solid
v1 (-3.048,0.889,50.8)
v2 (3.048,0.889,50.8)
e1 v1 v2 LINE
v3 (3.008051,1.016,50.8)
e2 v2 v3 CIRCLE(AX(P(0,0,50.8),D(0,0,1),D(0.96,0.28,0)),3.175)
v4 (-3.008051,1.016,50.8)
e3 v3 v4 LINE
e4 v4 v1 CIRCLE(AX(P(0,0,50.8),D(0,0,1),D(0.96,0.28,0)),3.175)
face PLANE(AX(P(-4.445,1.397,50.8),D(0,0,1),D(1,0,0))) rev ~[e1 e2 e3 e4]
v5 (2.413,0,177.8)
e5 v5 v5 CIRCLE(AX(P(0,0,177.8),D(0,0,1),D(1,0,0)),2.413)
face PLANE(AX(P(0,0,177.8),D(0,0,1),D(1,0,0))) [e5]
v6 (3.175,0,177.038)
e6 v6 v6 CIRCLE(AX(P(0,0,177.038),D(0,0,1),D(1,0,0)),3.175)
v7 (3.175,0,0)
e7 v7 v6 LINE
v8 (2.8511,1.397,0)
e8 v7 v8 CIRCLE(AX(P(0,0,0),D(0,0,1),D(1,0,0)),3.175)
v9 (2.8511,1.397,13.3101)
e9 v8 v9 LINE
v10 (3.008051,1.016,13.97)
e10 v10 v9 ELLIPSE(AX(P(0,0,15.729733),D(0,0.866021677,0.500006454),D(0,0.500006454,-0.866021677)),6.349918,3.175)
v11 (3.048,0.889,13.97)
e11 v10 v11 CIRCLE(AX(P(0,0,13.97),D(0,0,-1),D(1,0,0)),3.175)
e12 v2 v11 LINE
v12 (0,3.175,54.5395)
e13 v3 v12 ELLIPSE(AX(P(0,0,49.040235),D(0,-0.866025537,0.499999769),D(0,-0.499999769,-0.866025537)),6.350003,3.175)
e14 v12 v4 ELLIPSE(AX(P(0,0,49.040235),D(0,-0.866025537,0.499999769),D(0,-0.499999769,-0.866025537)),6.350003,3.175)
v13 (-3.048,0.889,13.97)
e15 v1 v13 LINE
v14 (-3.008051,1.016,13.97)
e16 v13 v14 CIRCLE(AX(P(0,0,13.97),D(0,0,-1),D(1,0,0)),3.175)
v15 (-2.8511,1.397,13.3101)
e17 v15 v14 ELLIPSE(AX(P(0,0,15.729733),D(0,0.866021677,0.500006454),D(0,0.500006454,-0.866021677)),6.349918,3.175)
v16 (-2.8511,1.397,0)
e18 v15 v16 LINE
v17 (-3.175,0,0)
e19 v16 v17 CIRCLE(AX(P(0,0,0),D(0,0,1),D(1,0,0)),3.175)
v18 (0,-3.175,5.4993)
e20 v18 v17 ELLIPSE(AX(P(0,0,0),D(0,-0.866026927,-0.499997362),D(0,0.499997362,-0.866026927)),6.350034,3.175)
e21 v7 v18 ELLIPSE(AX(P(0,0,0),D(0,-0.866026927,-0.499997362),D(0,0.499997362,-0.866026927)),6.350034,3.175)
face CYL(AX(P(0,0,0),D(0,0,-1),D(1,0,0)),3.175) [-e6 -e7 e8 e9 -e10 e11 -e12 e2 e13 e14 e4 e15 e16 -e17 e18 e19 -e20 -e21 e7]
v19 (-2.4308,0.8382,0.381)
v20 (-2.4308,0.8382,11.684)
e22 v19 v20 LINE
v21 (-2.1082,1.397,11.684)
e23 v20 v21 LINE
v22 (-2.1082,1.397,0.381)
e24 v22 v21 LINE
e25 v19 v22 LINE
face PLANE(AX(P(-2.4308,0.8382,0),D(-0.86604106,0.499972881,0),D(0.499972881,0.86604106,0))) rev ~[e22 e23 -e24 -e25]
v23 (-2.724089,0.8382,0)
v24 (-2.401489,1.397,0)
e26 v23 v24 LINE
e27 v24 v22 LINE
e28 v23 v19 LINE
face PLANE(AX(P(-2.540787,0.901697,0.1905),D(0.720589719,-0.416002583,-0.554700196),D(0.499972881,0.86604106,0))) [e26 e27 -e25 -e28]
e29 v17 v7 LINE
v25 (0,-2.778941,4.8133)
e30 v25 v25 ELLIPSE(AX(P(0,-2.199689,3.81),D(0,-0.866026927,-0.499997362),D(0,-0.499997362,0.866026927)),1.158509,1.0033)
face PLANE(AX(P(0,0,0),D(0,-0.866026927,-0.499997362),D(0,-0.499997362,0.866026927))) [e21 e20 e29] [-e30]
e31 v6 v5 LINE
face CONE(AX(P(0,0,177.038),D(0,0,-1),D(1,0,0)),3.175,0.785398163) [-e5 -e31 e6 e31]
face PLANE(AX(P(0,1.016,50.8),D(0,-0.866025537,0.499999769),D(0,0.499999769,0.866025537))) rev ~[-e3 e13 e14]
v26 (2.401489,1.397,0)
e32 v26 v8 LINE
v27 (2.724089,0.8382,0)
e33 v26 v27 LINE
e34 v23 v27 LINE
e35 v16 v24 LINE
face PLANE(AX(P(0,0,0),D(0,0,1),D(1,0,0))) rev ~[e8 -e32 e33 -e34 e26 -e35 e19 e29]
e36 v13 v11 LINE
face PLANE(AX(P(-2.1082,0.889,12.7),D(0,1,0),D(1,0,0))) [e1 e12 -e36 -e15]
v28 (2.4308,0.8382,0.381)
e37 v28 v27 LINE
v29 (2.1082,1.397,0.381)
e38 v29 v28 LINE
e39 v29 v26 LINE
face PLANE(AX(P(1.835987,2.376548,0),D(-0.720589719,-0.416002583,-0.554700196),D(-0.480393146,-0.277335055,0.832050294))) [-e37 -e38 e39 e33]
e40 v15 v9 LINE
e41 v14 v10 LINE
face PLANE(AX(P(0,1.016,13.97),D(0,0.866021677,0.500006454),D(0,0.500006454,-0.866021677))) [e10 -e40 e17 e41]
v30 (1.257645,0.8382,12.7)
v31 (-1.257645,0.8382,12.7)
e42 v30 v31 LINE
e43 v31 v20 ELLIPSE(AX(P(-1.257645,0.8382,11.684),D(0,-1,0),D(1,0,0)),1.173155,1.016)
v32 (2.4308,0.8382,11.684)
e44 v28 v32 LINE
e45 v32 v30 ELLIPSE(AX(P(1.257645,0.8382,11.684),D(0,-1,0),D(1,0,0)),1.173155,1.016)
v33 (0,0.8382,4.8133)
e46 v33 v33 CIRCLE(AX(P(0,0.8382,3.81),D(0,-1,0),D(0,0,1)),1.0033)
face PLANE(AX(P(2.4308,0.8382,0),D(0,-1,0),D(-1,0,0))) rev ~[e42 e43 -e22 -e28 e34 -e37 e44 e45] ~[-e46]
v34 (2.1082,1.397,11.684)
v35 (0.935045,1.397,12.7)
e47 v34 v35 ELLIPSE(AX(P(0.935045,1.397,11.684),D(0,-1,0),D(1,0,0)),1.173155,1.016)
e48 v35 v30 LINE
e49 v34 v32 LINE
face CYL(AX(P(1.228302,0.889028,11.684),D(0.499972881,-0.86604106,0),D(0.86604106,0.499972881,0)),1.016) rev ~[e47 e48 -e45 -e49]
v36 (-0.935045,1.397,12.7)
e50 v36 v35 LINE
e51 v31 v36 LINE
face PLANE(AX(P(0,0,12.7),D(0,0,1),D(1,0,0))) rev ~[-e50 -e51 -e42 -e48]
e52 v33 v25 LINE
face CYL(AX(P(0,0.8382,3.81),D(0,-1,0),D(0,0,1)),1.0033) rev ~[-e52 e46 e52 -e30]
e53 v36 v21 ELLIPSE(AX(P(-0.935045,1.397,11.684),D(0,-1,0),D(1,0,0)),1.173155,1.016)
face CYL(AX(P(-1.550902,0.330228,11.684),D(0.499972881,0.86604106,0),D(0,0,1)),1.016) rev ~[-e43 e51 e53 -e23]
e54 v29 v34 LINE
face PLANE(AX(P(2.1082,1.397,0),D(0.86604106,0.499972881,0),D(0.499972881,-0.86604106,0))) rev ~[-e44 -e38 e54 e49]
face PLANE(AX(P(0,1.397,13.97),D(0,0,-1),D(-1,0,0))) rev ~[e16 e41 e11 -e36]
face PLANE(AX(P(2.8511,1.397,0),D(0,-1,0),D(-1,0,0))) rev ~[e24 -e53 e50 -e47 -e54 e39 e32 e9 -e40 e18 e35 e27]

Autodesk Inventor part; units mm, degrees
ref_plane "YZ Plane" through (0, 0, 0) normal (1, 0, 0) x (0, 1, 0)
ref_plane "XZ Plane" through (0, 0, 0) normal (0, 1, 0) x (-1, 0, 0)
ref_plane "XY Plane" through (0, 0, 0) normal (0, 0, 1) x (1, 0, 0)
sketch "Sketch1" plane through (0, 0, 0) normal (0, 0, 1) x (1, 0, 0)
  circle A0 centre (0, 0) radius 3.175
  dimension "d0" = 6.35
extrude "Extrusion1" add sketch "Sketch1" along normal blind 177.8
sketch "Sketch2" plane through (0, 0, 0) normal (0, 0, 1) x (1, 0, 0)
  circle A0 centre (0, 0) radius 3.175 projected
  line L0 (2.5773, 1.8542) -> (-2.5773, 1.8542)
  line L1 (0, 4.445) -> (0, -4.445) projected
  line L2 (-4.445, 0) -> (4.445, 0) projected
  line L3 (2.8511, 1.397) -> (-2.8511, 1.397)
  line L4 (2.1082, 1.397) -> (2.4308, 0.8382)
  line L5 (2.4308, 0.8382) -> (-2.4308, 0.8382)
  line L6 (-2.4308, 0.8382) -> (-2.1082, 1.397)
  line L7 (0, 0) -> (0, 3.175)
  dimension "d6" = 1.397
  dimension "d9" = 60
  dimension "d10" = 4.2164
  dimension "d11" = 0.5588
  dimension "d40" = 0.4572
extrude "Extrusion3" cut sketch "Sketch2" along normal blind 12.7 contours L3 L1 L0 A0 | L1 L3 A0 L0
extrude "Extrusion4" cut sketch "Sketch2" along normal up to surface (12.7 mm away) contours L4 L5 L1 L3 | L5 L6 L3 L1
sketch "Sketch3" plane through (-2.4308, 0.8382, 12.7) normal (0, 1, 0) x (1, 0, 0)
  line L0 (0, 12.7) -> (4.8616, 12.7) projected
  line L1 (2.4308, 48.26) -> (2.4308, -200.66) projected
  point P0 (2.4308, 12.7)
  point P1 (2.4308, 8.89)
  dimension "d14" = 3.81
hole "Hole1" at (0, 0.8382, 3.81) direction (0, -1, 0) diameter 2.0066 end through all
sketch "Sketch4" plane through (0, 0, 0) normal (1, 0, 0) x (0, 1, 0)
  line L0 (0, 213.36) -> (0, -35.56) projected
  line L1 (-3.175, 0) -> (-3.175, 177.8) projected
  line L2 (0, 0) -> (-3.175, 5.4993)
  line L3 (-3.175, 5.4993) -> (-3.175, 0)
  line L4 (-3.175, 0) -> (0, 0)
  dimension "d23" = 30
extrude "Extrusion5" cut sketch "Sketch4" along normal mid plane 12.7
chamfer "Chamfer1" distance 0.254 distance2 0.381 1 edges at (-2.2695, 1.1176, 0) measured on face at (0.8103, 0.2794, 0)
chamfer "Chamfer2" distance 0.254 distance2 0.381 1 edges at (2.2695, 1.1176, 0) measured on face at (0.8103, 0.2794, 0)
chamfer "Chamfer3" distance 0.762 angle 45 1 edges at (-3.175, 0, 177.8)
extrude "Extrusion7" cut sketch "Sketch2" along normal blind 50.8 contours L3 L1 L0 A0 | L0 L1 A0 | L1 L0 A0 | L1 L3 A0 L0
sketch "Sketch6" plane through (-2.1082, 1.397, 12.7) normal (0, 1, 0) x (1, 0, 0)
  line L0 (-0.7429, -38.1) -> (4.9593, -38.1) projected
  line L1 (0, 0) -> (4.2164, 0) projected
  line L2 (2.1082, 48.26) -> (2.1082, -200.66) projected
  line L3 (8.3312, 12.7) -> (-4.1148, 12.7) projected
  line L4 (6.5532, -1.27) -> (-2.3368, -1.27)
  line L5 (-2.3368, -1.27) -> (-2.3368, -38.1)
  line L6 (-2.3368, -38.1) -> (6.5532, -38.1)
  line L7 (6.5532, -38.1) -> (6.5532, -1.27)
  line L8 (6.5532, -1.27) -> (-2.3368, -38.1) construction
  line L9 (-2.3368, -1.27) -> (6.5532, -38.1) construction
  point P0 (2.1082, 12.7)
  point P1 (2.1082, -19.685)
  dimension "d43" = 0
  dimension "d44" = 1.27
  dimension "d45" = 8.89
extrude "Extrusion8" cut sketch "Sketch6" against normal blind 0.508
sketch "Sketch8" plane through (-2.8511, 1.397, 13.97) normal (0, 1, 0) x (1, 0, 0)
  point P0 (2.8511, 13.97)
sketch "Sketch9" plane through (-2.1082, 1.397, 12.7) normal (0, 1, 0) x (1, 0, 0)
  point P0 (2.1082, 12.7)
sketch "Sketch10" plane through (-2.1082, 1.397, 12.7) normal (0, 1, 0) x (1, 0, 0)
  point P0 (2.1082, 12.7)
fillet "Fillet3" radius 1.016 2 edges at (-2.2695, 1.1176, 12.7) (2.2695, 1.1176, 12.7)
sketch "Sketch11" plane through (0, 0, 0) normal (1, 0, 0) x (0, 1, 0)
  line L0 (0.889, 13.97) -> (0.889, 50.8) projected
  line L1 (3.175, 50.8) -> (3.175, 177.038) projected
  line L2 (1.016, 50.8) -> (3.175, 54.5395)
  line L3 (0.889, 13.97) -> (1.397, 13.97) projected
  line L4 (-4.445, 0) -> (4.445, 0) projected
  line L5 (1.016, 13.97) -> (1.397, 13.3101)
  line L6 (1.397, 13.3101) -> (1.397, 13.97)
  line L7 (1.016, 13.97) -> (1.397, 13.97)
  line L8 (0.8382, 12.7) -> (1.397, 12.7) projected
  line L9 (3.175, 54.5395) -> (3.175, 50.8)
  line L10 (3.175, 50.8) -> (0.889, 50.8) projected
  line L11 (1.016, 50.8) -> (3.175, 50.8)
  point P0 (0, 0)
  dimension "d56" = 0.127
  dimension "d57" = 13.97
  dimension "d58" = 0.127
  dimension "d59" = 30
  dimension "d60" = 0.6101
extrude "Extrusion10" cut sketch "Sketch11" along normal mid plane 6.35
properties part number "J007778 NEUROPIXELS DOVE TAIL PROBE HOLDER Rev A" material "ALUMINUM, 6061-T651"
